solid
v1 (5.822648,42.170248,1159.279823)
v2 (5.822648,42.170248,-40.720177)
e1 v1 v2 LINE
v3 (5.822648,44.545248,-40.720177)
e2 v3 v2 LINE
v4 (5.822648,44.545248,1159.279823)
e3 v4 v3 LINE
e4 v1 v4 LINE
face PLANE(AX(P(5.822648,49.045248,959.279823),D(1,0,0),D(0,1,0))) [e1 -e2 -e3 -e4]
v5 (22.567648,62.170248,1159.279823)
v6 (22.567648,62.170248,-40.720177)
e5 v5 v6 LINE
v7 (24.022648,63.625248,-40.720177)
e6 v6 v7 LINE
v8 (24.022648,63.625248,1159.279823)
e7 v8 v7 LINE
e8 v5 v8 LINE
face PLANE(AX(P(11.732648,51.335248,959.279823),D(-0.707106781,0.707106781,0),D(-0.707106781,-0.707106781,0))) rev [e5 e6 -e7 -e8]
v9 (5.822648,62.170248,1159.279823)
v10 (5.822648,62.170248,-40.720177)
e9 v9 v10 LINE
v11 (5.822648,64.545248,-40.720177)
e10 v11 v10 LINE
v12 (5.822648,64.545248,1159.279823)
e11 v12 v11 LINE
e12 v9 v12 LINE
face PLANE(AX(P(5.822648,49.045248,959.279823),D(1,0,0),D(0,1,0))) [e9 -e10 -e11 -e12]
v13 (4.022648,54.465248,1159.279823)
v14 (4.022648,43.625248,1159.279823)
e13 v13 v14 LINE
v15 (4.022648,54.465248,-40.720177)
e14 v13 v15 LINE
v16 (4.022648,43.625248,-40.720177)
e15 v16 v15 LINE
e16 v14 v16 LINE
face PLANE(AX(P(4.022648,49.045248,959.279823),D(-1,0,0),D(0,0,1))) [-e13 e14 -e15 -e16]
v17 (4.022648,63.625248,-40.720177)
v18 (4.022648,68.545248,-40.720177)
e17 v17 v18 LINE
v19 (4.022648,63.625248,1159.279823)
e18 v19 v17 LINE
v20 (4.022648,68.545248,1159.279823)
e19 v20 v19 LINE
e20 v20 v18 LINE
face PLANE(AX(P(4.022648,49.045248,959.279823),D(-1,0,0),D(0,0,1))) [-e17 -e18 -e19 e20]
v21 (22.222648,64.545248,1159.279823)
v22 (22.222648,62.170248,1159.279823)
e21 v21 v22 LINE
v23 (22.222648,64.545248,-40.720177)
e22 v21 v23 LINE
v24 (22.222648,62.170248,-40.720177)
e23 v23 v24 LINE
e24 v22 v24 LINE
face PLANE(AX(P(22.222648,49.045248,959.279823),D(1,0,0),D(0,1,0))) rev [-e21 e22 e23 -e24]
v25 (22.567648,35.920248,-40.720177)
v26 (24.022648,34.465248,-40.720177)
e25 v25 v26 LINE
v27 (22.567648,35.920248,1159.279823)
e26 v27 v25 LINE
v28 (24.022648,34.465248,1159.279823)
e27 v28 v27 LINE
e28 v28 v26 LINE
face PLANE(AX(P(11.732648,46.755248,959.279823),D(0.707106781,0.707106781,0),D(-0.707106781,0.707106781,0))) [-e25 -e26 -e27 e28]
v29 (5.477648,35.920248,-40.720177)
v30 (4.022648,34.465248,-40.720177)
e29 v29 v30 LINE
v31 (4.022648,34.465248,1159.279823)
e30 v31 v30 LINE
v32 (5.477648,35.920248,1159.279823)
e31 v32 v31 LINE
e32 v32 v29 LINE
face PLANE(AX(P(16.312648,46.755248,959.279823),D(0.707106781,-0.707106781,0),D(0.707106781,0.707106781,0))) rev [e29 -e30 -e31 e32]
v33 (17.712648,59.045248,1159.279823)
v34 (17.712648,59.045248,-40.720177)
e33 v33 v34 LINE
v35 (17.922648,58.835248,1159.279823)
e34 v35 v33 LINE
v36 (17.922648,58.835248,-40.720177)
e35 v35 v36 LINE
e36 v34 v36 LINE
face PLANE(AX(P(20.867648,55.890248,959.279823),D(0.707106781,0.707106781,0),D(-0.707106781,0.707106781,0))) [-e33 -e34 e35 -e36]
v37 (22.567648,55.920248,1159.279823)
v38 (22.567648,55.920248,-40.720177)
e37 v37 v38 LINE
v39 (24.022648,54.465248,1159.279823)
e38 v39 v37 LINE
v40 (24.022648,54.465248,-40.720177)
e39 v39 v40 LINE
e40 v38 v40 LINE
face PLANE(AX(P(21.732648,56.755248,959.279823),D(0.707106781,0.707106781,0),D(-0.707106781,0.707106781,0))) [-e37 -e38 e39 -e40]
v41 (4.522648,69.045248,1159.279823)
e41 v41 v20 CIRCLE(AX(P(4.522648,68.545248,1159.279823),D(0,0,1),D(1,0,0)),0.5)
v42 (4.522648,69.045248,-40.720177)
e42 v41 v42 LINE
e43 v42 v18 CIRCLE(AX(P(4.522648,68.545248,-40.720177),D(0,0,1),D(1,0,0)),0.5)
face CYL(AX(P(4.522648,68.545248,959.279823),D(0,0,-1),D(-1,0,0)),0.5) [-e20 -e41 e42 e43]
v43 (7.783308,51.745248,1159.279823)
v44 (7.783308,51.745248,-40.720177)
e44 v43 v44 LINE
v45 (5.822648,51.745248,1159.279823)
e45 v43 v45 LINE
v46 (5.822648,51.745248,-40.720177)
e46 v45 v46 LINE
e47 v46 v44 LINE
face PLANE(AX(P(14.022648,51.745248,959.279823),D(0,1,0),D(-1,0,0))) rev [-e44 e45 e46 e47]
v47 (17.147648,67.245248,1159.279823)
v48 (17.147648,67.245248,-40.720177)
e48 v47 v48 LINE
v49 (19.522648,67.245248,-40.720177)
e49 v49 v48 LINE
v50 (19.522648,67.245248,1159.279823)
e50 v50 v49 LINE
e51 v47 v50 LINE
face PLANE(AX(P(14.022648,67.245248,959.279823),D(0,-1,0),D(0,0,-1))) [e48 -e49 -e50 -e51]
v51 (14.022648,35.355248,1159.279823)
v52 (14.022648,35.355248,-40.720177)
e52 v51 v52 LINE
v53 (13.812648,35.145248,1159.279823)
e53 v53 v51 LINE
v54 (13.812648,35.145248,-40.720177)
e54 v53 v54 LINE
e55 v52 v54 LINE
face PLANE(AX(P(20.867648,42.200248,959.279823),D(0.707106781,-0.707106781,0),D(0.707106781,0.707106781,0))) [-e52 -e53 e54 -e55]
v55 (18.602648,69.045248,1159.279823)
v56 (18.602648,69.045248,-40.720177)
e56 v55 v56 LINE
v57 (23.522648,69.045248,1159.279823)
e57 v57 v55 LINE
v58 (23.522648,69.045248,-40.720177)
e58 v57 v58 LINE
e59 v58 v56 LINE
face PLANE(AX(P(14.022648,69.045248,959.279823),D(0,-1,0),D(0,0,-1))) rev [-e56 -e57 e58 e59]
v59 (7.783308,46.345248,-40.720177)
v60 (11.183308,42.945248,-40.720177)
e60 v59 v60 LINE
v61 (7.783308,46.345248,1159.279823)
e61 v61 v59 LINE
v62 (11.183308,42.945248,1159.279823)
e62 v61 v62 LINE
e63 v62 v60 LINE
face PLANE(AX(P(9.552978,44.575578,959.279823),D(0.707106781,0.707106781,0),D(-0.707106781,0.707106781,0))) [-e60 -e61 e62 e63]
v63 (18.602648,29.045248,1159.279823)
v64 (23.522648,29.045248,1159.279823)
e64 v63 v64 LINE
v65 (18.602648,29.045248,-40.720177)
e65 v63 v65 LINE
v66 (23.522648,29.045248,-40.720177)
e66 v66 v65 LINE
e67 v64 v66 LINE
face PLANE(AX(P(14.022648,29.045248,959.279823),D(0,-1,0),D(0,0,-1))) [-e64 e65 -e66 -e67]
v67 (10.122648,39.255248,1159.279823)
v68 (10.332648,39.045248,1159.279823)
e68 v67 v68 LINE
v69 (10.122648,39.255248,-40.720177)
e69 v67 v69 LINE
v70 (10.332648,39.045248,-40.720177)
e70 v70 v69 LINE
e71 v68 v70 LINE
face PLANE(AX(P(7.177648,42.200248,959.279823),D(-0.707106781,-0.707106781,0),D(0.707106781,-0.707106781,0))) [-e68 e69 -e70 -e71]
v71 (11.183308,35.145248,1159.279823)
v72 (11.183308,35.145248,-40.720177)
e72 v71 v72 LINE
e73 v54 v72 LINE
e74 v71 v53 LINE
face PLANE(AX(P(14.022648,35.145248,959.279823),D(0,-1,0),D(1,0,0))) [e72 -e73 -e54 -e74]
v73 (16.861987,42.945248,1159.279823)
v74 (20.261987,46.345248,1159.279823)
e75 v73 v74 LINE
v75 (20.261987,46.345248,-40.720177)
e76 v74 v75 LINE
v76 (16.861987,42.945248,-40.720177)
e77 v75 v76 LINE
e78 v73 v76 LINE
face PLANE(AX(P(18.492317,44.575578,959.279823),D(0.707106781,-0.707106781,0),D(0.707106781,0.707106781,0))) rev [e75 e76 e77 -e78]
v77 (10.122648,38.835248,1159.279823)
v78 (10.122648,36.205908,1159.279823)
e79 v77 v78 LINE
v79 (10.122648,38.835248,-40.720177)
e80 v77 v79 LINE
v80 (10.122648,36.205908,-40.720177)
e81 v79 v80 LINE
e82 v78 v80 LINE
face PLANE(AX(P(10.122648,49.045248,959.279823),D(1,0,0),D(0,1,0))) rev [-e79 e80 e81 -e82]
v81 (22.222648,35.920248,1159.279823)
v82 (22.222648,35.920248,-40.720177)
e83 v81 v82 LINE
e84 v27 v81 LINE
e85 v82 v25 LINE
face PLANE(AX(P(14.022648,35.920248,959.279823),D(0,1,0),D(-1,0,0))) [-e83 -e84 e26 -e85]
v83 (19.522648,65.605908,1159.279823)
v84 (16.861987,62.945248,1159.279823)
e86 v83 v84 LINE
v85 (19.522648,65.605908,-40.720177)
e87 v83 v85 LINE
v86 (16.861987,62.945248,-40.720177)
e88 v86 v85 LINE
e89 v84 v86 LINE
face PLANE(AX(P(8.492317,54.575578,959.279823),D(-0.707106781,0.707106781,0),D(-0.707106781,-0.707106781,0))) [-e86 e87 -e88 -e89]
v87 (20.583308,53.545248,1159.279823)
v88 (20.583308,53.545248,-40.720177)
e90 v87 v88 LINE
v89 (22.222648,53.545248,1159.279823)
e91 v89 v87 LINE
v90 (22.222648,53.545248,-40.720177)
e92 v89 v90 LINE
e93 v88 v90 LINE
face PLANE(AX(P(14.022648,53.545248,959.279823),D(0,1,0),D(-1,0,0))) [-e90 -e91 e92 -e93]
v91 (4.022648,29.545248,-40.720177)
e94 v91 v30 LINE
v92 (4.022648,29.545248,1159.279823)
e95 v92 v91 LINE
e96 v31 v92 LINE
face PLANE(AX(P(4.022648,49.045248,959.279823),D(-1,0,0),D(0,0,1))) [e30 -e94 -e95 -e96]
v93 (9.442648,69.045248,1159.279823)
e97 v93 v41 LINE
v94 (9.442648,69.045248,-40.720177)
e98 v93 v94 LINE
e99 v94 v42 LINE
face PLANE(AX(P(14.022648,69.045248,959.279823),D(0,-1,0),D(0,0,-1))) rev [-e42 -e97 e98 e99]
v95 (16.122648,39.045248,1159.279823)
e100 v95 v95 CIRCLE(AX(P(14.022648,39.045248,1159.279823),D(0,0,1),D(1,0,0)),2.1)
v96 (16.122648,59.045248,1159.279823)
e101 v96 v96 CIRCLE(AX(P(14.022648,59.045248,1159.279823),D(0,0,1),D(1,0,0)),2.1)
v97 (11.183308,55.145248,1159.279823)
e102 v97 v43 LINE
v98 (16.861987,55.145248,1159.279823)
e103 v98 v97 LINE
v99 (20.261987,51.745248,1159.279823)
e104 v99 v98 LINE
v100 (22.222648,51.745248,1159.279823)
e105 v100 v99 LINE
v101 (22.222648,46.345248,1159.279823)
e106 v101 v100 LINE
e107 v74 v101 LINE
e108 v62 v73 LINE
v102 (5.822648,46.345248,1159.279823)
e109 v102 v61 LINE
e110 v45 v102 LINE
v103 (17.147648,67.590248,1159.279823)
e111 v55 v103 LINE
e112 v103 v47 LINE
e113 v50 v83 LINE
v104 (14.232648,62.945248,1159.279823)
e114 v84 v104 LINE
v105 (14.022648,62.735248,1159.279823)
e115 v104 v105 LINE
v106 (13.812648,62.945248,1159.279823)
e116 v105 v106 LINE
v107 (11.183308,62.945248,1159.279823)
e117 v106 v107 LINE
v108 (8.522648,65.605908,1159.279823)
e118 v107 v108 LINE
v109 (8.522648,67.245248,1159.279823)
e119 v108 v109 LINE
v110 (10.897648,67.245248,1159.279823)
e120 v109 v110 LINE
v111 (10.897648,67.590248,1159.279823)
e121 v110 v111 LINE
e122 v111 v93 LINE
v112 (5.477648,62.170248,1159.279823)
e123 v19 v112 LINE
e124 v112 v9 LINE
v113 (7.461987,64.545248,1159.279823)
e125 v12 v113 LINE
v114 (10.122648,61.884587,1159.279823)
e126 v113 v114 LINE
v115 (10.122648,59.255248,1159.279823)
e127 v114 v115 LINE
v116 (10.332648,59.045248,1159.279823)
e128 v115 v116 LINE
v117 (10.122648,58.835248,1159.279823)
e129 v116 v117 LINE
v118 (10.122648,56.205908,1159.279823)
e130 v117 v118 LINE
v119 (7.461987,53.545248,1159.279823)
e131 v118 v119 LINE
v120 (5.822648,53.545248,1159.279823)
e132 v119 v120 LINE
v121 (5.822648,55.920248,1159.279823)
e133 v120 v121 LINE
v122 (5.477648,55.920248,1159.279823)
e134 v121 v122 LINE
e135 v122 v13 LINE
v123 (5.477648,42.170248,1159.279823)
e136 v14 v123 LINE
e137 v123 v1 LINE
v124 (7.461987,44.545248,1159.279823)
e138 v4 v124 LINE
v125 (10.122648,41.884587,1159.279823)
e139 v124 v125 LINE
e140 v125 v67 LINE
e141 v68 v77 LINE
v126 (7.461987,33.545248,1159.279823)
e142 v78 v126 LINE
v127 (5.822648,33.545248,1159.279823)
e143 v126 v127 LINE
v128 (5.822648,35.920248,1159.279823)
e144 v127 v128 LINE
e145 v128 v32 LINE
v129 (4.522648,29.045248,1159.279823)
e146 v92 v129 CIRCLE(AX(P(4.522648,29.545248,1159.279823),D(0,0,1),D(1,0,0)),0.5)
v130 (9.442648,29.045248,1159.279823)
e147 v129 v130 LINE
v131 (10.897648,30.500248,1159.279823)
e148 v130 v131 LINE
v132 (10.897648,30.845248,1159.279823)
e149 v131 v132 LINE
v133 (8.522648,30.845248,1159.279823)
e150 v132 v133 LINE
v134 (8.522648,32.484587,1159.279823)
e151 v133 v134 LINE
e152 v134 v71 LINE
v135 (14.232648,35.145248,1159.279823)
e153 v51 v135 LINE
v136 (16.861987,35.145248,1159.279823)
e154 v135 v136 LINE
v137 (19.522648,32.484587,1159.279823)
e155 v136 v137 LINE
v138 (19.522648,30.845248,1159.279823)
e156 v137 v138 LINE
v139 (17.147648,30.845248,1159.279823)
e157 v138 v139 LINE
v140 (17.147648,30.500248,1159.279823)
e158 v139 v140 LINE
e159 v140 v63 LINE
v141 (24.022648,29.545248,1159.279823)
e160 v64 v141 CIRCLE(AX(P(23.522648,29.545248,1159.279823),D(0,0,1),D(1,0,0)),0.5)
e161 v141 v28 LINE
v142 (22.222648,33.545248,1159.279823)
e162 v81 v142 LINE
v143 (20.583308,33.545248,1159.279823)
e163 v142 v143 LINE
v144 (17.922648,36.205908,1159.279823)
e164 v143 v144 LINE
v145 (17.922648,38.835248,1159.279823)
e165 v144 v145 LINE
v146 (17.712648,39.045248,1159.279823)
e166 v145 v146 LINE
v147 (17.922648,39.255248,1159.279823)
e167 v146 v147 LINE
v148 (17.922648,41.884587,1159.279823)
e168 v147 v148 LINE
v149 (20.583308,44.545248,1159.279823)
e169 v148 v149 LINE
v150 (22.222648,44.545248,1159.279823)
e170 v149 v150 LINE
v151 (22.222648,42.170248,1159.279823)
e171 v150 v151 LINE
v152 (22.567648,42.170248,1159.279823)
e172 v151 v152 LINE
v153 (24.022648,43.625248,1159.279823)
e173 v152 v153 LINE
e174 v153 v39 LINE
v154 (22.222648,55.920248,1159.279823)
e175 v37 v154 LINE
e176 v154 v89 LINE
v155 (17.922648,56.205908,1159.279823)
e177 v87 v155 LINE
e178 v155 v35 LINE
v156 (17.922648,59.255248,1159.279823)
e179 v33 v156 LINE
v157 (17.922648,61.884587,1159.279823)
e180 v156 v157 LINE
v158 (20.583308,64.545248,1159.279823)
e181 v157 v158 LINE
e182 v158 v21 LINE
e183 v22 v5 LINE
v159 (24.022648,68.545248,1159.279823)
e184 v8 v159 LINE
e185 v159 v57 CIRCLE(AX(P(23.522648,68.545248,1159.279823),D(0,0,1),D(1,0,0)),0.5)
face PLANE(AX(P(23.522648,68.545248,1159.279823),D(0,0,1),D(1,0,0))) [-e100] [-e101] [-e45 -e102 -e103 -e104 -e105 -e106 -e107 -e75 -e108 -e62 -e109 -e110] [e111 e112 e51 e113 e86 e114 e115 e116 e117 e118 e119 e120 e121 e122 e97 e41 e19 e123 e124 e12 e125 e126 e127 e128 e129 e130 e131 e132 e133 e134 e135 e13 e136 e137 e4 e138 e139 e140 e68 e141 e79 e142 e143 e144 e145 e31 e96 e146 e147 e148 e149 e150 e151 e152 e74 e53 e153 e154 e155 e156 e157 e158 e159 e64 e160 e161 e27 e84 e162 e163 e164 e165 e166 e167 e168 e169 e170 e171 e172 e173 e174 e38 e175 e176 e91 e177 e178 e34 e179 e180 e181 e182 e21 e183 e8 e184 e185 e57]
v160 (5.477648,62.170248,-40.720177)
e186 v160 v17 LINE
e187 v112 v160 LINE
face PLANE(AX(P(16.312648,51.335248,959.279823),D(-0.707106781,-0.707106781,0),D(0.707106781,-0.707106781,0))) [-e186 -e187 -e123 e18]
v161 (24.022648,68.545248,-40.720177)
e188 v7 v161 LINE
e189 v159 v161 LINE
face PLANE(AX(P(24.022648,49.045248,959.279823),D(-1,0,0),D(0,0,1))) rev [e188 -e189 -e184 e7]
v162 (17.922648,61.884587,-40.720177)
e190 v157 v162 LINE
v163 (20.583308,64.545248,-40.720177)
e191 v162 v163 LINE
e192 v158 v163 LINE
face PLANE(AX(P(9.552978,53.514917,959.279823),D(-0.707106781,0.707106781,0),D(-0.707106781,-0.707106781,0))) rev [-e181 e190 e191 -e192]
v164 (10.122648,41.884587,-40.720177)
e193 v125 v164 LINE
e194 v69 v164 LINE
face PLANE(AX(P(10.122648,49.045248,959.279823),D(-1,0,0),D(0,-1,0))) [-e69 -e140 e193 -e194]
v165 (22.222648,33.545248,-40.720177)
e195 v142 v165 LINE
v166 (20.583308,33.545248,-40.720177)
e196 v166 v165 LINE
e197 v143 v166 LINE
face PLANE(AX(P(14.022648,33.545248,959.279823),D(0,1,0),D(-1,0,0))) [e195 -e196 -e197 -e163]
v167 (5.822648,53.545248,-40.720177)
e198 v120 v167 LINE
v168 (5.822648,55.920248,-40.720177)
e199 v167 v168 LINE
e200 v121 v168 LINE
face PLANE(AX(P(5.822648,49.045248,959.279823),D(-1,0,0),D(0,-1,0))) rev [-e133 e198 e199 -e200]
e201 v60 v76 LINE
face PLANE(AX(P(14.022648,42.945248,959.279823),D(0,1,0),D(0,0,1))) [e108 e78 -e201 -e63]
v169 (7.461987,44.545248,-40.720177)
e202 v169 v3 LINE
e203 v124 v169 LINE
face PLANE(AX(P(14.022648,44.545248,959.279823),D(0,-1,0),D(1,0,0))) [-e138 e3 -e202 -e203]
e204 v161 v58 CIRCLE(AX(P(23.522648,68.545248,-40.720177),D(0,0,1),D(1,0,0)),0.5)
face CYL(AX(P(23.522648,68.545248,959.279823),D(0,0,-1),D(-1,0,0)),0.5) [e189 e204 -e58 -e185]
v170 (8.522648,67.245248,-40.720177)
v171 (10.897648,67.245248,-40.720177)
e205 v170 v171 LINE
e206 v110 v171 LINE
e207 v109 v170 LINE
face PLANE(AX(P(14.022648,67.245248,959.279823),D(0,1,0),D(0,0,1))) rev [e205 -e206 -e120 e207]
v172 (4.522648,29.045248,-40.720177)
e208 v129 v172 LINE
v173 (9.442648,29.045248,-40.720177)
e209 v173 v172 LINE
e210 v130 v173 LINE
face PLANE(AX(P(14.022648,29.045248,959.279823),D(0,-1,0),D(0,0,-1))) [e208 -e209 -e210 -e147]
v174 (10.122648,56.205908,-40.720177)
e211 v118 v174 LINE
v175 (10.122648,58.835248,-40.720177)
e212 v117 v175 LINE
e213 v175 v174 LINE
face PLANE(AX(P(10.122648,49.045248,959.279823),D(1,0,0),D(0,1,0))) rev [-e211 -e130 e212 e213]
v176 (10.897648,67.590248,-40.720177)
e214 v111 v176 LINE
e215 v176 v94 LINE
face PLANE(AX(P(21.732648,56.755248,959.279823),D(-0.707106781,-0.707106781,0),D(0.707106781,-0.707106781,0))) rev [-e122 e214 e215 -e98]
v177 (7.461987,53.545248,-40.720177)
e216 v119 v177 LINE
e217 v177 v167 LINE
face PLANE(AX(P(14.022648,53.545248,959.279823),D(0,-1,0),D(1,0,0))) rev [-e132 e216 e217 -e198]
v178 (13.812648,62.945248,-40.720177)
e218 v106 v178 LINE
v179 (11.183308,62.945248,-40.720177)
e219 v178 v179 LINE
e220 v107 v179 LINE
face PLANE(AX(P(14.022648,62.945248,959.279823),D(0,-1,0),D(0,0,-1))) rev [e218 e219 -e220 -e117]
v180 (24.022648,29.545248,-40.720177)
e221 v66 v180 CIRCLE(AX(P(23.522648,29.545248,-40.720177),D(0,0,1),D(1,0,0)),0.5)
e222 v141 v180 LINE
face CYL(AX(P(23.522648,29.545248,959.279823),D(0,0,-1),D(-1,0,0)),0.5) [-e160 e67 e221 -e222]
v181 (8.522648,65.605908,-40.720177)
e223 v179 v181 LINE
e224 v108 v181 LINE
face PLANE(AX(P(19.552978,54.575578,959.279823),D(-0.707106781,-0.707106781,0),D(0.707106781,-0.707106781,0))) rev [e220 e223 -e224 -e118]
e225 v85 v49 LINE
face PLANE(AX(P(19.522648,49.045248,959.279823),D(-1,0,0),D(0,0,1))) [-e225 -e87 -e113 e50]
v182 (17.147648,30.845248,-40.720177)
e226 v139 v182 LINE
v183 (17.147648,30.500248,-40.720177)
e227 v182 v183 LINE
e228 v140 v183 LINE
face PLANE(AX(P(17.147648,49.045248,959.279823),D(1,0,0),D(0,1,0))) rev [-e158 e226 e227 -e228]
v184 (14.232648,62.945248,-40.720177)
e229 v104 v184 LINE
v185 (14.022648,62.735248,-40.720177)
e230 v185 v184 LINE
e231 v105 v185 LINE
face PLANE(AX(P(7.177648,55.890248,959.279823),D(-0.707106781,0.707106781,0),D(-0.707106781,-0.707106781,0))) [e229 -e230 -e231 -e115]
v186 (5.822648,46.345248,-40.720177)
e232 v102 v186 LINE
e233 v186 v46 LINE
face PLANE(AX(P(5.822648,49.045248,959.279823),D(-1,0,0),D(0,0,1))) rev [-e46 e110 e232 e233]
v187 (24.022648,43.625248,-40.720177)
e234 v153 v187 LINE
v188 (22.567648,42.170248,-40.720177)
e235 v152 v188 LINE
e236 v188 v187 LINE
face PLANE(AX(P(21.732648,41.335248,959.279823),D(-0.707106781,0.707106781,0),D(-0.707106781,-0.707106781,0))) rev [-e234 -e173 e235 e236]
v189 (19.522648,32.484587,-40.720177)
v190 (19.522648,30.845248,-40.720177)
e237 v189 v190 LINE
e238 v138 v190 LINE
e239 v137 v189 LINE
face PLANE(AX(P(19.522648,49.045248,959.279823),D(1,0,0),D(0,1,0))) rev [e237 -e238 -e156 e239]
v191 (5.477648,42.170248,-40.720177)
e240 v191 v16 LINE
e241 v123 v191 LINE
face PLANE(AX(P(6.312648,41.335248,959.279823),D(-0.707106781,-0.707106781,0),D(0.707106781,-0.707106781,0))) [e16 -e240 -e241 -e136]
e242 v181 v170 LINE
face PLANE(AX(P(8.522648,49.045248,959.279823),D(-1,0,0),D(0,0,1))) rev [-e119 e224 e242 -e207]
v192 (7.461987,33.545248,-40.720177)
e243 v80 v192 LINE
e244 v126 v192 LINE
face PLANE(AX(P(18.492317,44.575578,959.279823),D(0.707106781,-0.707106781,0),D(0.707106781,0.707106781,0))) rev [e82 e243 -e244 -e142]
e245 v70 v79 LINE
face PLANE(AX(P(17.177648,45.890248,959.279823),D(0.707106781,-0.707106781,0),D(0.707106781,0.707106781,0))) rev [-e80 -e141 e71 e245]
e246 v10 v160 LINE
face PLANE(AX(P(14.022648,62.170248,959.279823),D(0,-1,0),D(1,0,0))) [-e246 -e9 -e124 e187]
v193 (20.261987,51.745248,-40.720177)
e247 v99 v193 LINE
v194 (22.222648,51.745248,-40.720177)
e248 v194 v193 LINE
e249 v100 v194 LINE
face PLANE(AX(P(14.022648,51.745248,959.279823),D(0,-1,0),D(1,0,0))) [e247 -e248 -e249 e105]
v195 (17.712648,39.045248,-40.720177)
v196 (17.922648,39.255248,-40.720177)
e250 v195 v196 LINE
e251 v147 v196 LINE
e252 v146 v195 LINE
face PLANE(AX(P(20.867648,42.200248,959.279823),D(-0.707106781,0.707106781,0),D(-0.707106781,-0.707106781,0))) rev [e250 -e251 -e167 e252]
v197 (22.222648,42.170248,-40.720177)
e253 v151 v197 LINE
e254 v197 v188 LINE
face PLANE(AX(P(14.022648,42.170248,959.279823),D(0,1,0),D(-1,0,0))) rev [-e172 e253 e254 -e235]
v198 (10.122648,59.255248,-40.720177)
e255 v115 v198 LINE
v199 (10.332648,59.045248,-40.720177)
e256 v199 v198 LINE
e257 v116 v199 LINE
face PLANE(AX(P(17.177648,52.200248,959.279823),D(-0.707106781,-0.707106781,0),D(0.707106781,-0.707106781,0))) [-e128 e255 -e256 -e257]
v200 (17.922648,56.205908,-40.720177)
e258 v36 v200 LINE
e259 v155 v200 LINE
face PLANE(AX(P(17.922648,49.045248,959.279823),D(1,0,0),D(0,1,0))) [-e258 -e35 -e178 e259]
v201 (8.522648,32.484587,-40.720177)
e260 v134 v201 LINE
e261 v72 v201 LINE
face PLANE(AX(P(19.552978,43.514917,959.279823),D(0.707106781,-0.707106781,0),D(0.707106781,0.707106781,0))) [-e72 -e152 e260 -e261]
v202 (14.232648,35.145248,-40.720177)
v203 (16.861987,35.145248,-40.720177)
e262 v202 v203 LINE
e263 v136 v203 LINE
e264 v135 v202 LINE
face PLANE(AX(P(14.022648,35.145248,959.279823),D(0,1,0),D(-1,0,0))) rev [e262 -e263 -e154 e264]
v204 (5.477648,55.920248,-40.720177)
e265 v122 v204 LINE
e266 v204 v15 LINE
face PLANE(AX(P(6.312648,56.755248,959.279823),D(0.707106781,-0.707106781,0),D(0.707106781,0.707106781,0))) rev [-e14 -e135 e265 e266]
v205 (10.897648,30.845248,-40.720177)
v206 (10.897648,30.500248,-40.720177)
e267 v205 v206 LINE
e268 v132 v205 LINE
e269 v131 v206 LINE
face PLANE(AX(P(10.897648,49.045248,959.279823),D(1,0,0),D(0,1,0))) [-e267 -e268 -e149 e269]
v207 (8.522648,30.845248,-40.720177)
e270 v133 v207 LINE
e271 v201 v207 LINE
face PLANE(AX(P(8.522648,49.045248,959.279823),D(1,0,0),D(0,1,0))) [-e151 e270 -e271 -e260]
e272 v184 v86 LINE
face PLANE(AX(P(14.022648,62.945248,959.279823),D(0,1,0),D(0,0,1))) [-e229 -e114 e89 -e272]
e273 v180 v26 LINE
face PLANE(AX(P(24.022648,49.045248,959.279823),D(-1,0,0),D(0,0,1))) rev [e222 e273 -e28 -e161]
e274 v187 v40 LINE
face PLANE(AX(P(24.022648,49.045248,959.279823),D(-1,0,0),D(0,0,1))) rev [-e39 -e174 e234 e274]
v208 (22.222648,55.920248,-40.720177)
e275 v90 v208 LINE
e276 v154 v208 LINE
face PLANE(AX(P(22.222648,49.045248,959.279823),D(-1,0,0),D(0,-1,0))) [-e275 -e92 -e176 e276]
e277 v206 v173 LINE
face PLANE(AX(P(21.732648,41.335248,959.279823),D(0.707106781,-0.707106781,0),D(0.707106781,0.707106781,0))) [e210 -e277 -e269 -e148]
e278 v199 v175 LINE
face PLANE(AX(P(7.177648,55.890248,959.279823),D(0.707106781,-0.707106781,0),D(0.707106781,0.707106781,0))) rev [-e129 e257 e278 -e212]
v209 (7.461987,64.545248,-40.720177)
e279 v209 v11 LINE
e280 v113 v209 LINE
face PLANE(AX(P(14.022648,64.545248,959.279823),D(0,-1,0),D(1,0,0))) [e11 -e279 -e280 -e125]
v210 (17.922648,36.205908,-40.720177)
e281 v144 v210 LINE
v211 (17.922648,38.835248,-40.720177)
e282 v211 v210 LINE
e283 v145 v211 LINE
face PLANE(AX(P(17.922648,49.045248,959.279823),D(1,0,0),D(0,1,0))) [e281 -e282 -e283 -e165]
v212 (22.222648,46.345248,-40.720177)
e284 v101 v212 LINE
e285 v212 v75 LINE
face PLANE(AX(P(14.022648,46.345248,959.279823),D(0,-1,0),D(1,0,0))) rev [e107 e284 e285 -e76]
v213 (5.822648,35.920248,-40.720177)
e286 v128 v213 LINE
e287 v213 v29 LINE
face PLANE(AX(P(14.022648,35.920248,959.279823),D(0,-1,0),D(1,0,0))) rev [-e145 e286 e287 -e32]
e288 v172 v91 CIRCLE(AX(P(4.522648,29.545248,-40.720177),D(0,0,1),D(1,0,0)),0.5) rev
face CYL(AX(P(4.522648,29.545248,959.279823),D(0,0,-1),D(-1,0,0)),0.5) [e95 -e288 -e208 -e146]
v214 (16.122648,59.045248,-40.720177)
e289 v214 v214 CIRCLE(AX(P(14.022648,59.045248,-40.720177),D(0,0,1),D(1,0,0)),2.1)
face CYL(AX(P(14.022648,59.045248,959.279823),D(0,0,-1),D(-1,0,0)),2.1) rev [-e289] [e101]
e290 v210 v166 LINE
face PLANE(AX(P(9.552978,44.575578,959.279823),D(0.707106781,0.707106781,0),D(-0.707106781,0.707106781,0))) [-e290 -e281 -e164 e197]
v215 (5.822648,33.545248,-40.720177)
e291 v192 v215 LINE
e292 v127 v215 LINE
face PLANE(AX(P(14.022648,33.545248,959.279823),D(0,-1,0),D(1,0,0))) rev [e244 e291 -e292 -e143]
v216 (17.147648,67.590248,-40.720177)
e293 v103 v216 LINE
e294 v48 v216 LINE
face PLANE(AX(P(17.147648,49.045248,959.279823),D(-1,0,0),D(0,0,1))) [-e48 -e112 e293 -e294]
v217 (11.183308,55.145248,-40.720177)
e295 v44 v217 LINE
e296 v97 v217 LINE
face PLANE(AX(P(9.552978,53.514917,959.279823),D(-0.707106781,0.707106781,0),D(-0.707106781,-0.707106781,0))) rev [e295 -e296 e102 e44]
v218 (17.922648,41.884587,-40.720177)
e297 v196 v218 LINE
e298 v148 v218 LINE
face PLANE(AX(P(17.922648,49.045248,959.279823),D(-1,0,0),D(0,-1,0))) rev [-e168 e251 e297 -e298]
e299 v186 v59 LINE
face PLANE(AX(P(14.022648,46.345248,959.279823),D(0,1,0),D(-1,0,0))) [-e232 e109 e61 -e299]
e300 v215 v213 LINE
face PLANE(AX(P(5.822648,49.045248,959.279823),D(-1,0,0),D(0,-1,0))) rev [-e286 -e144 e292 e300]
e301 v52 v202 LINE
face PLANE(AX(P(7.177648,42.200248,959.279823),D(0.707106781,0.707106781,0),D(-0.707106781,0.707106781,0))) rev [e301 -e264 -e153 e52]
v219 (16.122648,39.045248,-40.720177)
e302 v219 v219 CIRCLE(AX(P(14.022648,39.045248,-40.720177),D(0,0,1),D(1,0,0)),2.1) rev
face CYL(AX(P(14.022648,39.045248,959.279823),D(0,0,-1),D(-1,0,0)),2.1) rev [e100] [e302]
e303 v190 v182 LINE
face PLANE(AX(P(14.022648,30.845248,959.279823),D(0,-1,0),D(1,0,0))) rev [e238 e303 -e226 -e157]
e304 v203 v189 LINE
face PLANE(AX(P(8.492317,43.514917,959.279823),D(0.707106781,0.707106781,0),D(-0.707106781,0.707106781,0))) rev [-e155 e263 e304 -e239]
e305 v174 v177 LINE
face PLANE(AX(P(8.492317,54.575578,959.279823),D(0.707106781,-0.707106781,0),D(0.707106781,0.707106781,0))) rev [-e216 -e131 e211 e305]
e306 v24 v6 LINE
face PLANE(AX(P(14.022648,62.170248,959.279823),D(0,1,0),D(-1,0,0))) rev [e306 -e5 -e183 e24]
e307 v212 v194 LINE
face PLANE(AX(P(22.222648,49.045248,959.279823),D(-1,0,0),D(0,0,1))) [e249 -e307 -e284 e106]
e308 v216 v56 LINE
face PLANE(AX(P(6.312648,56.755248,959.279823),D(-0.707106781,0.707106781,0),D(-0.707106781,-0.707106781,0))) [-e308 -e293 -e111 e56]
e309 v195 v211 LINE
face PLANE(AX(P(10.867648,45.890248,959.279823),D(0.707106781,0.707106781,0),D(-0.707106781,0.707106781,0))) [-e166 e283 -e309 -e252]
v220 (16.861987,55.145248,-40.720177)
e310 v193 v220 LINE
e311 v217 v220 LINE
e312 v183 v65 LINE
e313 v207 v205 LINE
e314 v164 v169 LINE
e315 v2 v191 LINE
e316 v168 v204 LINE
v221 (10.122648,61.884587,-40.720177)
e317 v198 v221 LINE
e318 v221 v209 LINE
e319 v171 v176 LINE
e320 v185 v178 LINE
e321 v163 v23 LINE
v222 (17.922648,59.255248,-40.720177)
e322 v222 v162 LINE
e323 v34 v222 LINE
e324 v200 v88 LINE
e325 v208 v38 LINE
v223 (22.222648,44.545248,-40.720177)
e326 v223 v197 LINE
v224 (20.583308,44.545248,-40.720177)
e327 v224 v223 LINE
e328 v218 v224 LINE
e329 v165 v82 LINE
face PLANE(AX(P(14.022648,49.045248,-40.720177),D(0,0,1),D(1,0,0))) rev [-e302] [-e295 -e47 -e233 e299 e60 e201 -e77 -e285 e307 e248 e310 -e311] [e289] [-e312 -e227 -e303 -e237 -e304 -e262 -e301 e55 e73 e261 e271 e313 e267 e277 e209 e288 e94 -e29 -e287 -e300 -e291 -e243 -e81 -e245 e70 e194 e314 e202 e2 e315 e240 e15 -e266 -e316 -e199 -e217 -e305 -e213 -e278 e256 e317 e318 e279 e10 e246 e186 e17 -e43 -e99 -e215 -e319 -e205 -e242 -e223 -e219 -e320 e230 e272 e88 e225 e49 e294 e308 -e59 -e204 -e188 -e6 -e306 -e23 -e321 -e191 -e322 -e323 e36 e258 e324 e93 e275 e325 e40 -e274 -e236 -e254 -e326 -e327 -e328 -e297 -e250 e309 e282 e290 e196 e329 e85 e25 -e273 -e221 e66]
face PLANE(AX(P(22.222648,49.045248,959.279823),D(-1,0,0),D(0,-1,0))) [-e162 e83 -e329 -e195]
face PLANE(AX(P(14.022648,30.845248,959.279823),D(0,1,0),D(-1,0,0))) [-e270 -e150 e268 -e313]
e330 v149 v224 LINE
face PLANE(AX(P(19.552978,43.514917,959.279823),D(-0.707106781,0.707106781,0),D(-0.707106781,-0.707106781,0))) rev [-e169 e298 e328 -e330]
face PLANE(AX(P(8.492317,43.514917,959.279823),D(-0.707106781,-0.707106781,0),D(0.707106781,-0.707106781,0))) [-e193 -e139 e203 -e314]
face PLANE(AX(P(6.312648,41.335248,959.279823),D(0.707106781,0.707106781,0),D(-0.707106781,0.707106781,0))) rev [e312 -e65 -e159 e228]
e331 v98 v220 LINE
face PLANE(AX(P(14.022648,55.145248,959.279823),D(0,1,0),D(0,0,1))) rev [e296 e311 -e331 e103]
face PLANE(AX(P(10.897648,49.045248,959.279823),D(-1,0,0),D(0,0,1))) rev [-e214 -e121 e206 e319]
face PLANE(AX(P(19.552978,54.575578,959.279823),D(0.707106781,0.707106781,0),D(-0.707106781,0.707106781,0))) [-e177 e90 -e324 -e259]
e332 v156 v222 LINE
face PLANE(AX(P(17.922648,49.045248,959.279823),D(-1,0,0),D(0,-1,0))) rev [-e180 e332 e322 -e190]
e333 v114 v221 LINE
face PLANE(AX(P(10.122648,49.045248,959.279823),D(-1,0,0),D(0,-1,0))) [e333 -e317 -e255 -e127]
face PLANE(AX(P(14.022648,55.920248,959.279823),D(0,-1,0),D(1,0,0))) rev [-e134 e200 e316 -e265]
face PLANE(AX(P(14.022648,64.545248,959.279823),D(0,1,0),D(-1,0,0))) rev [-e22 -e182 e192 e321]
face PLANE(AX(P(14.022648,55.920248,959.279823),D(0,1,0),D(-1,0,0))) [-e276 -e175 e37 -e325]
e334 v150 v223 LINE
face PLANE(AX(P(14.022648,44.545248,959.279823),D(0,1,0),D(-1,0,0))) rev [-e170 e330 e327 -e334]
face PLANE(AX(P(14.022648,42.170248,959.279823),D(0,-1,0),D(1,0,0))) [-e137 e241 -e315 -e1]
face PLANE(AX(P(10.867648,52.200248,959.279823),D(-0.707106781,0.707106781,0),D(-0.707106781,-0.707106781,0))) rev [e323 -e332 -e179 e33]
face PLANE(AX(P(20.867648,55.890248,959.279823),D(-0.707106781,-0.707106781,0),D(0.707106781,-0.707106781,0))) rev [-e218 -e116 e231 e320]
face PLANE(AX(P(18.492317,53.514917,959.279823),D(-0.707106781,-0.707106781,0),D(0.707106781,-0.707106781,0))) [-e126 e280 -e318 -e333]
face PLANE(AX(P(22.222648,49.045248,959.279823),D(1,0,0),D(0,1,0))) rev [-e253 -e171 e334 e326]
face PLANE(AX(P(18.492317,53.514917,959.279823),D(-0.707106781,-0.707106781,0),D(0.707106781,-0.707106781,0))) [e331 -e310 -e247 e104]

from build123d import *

# Parameters (mm, degrees)
V_SLOT_START                            = -40.720177315
V_SLOT_20X40X1000_LINEAR_RAIL_OUTLINE_R = 2.1
V_SLOT_20X40X1000_LINEAR_RAIL_DEPTH     = 1000
SKETCH1_R                               = 2.1
BOSS_EXTRUDE1_DEPTH                     = 200


# Read off the part's stored shape, not the designer's step: V-Slot 20x40x1000 Linear Rail
with BuildPart() as part:
    # V-Slot 20x40x1000 Linear Rail outline → V-Slot 20x40x1000 Linear Rail (new body)
    with BuildSketch(Plane.XY.offset(V_SLOT_START)):
        with BuildLine():
            Line((17.922647509, 56.20590772), (17.922647509, 58.835247549))
            Line((17.922647509, 58.835247549), (17.712647509, 59.045247549))
            Line((17.712647509, 59.045247549), (17.922647509, 59.255247549))
            Line((17.922647509, 59.255247549), (17.922647509, 61.884587377))
            Line((17.922647509, 61.884587377), (20.583307681, 64.545247549))
            Line((20.583307681, 64.545247549), (22.222647509, 64.545247549))
            Line((22.222647509, 64.545247549), (22.222647509, 62.170247549))
            Line((22.222647509, 62.170247549), (22.567647509, 62.170247549))
            Line((22.567647509, 62.170247549), (24.022647509, 63.625247549))
            Line((24.022647509, 63.625247549), (24.022647509, 68.545247549))
            ThreePointArc((24.022647509, 68.545247549), (23.876200899, 68.898800939), (23.522647509, 69.045247549))
            Line((23.522647509, 69.045247549), (18.602647509, 69.045247549))
            Line((18.602647509, 69.045247549), (17.147647509, 67.590247549))
            Line((17.147647509, 67.590247549), (17.147647509, 67.245247549))
            Line((17.147647509, 67.245247549), (19.522647509, 67.245247549))
            Line((19.522647509, 67.245247549), (19.522647509, 65.60590772))
            Line((19.522647509, 65.60590772), (16.861987337, 62.945247549))
            Line((16.861987337, 62.945247549), (14.232647509, 62.945247549))
            Line((14.232647509, 62.945247549), (14.022647509, 62.735247549))
            Line((14.022647509, 62.735247549), (13.812647509, 62.945247549))
            Line((13.812647509, 62.945247549), (11.183307681, 62.945247549))
            Line((11.183307681, 62.945247549), (8.522647509, 65.60590772))
            Line((8.522647509, 65.60590772), (8.522647509, 67.245247549))
            Line((8.522647509, 67.245247549), (10.897647509, 67.245247549))
            Line((10.897647509, 67.245247549), (10.897647509, 67.590247549))
            Line((10.897647509, 67.590247549), (9.442647509, 69.045247549))
            Line((9.442647509, 69.045247549), (4.522647509, 69.045247549))
            ThreePointArc((4.522647509, 69.045247549), (4.169094118, 68.898800939), (4.022647509, 68.545247549))
            Line((4.022647509, 68.545247549), (4.022647509, 63.625247549))
            Line((4.022647509, 63.625247549), (5.477647509, 62.170247549))
            Line((5.477647509, 62.170247549), (5.822647509, 62.170247549))
            Line((5.822647509, 62.170247549), (5.822647509, 64.545247549))
            Line((5.822647509, 64.545247549), (7.461987337, 64.545247549))
            Line((7.461987337, 64.545247549), (10.122647509, 61.884587377))
            Line((10.122647509, 61.884587377), (10.122647509, 59.255247549))
            Line((10.122647509, 59.255247549), (10.332647509, 59.045247549))
            Line((10.332647509, 59.045247549), (10.122647509, 58.835247549))
            Line((10.122647509, 58.835247549), (10.122647509, 56.20590772))
            Line((10.122647509, 56.20590772), (7.461987337, 53.545247549))
            Line((7.461987337, 53.545247549), (5.822647509, 53.545247549))
            Line((5.822647509, 53.545247549), (5.822647509, 55.920247549))
            Line((5.822647509, 55.920247549), (5.477647509, 55.920247549))
            Line((5.477647509, 55.920247549), (4.022647509, 54.465247549))
            Line((4.022647509, 54.465247549), (4.022647509, 43.625247549))
            Line((4.022647509, 43.625247549), (5.477647509, 42.170247549))
            Line((5.477647509, 42.170247549), (5.822647509, 42.170247549))
            Line((5.822647509, 42.170247549), (5.822647509, 44.545247549))
            Line((5.822647509, 44.545247549), (7.461987337, 44.545247549))
            Line((7.461987337, 44.545247549), (10.122647509, 41.884587377))
            Line((10.122647509, 41.884587377), (10.122647509, 39.255247549))
            Line((10.122647509, 39.255247549), (10.332647509, 39.045247549))
            Line((10.332647509, 39.045247549), (10.122647509, 38.835247549))
            Line((10.122647509, 38.835247549), (10.122647509, 36.20590772))
            Line((10.122647509, 36.20590772), (7.461987337, 33.545247549))
            Line((7.461987337, 33.545247549), (5.822647509, 33.545247549))
            Line((5.822647509, 33.545247549), (5.822647509, 35.920247549))
            Line((5.822647509, 35.920247549), (5.477647509, 35.920247549))
            Line((5.477647509, 35.920247549), (4.022647509, 34.465247549))
            Line((4.022647509, 34.465247549), (4.022647509, 29.545247549))
            ThreePointArc((4.022647509, 29.545247549), (4.169094118, 29.191694158), (4.522647509, 29.045247549))
            Line((4.522647509, 29.045247549), (9.442647509, 29.045247549))
            Line((9.442647509, 29.045247549), (10.897647509, 30.500247549))
            Line((10.897647509, 30.500247549), (10.897647509, 30.845247549))
            Line((10.897647509, 30.845247549), (8.522647509, 30.845247549))
            Line((8.522647509, 30.845247549), (8.522647509, 32.484587377))
            Line((8.522647509, 32.484587377), (11.183307681, 35.145247549))
            Line((11.183307681, 35.145247549), (13.812647509, 35.145247549))
            Line((13.812647509, 35.145247549), (14.022647509, 35.355247549))
            Line((14.022647509, 35.355247549), (14.232647509, 35.145247549))
            Line((14.232647509, 35.145247549), (16.861987337, 35.145247549))
            Line((16.861987337, 35.145247549), (19.522647509, 32.484587377))
            Line((19.522647509, 32.484587377), (19.522647509, 30.845247549))
            Line((19.522647509, 30.845247549), (17.147647509, 30.845247549))
            Line((17.147647509, 30.845247549), (17.147647509, 30.500247549))
            Line((17.147647509, 30.500247549), (18.602647509, 29.045247549))
            Line((18.602647509, 29.045247549), (23.522647509, 29.045247549))
            ThreePointArc((23.522647509, 29.045247549), (23.876200899, 29.191694158), (24.022647509, 29.545247549))
            Line((24.022647509, 29.545247549), (24.022647509, 34.465247549))
            Line((24.022647509, 34.465247549), (22.567647509, 35.920247549))
            Line((22.567647509, 35.920247549), (22.222647509, 35.920247549))
            Line((22.222647509, 35.920247549), (22.222647509, 33.545247549))
            Line((22.222647509, 33.545247549), (20.583307681, 33.545247549))
            Line((20.583307681, 33.545247549), (17.922647509, 36.20590772))
            Line((17.922647509, 36.20590772), (17.922647509, 38.835247549))
            Line((17.922647509, 38.835247549), (17.712647509, 39.045247549))
            Line((17.712647509, 39.045247549), (17.922647509, 39.255247549))
            Line((17.922647509, 39.255247549), (17.922647509, 41.884587377))
            Line((17.922647509, 41.884587377), (20.583307681, 44.545247549))
            Line((20.583307681, 44.545247549), (22.222647509, 44.545247549))
            Line((22.222647509, 44.545247549), (22.222647509, 42.170247549))
            Line((22.222647509, 42.170247549), (22.567647509, 42.170247549))
            Line((22.567647509, 42.170247549), (24.022647509, 43.625247549))
            Line((24.022647509, 43.625247549), (24.022647509, 54.465247549))
            Line((24.022647509, 54.465247549), (22.567647509, 55.920247549))
            Line((22.567647509, 55.920247549), (22.222647509, 55.920247549))
            Line((22.222647509, 55.920247549), (22.222647509, 53.545247549))
            Line((22.222647509, 53.545247549), (20.583307681, 53.545247549))
            Line((20.583307681, 53.545247549), (17.922647509, 56.20590772))
        make_face()
        with Locations((14.022647509, 39.045247549)):
            Circle(V_SLOT_20X40X1000_LINEAR_RAIL_OUTLINE_R, mode=Mode.SUBTRACT)
        Polygon((11.183307681, 42.945247549), (7.783307681, 46.345247549), (5.822647509, 46.345247549), (5.822647509, 51.745247549), (7.783307681, 51.745247549), (11.183307681, 55.145247549), (16.861987337, 55.145247549), (20.261987337, 51.745247549), (22.222647509, 51.745247549), (22.222647509, 46.345247549), (20.261987337, 46.345247549), (16.861987337, 42.945247549), align=None, mode=Mode.SUBTRACT)
        with Locations((14.022647509, 59.045247549)):
            Circle(V_SLOT_20X40X1000_LINEAR_RAIL_OUTLINE_R, mode=Mode.SUBTRACT)
    extrude(amount=V_SLOT_20X40X1000_LINEAR_RAIL_DEPTH)

    # Sketch1 → Boss-Extrude1 (add)
    with BuildSketch(Plane.XY.offset(959.279822685)):
        with BuildLine():
            Line((17.922647509, 58.835247549), (17.712647509, 59.045247549))
            Line((17.712647509, 59.045247549), (17.922647509, 59.255247549))
            Line((17.922647509, 59.255247549), (17.922647509, 61.884587377))
            Line((17.922647509, 61.884587377), (20.583307681, 64.545247549))
            Line((20.583307681, 64.545247549), (22.222647509, 64.545247549))
            Line((22.222647509, 64.545247549), (22.222647509, 62.170247549))
            Line((22.222647509, 62.170247549), (22.567647509, 62.170247549))
            Line((22.567647509, 62.170247549), (24.022647509, 63.625247549))
            Line((24.022647509, 63.625247549), (24.022647509, 68.545247549))
            ThreePointArc((24.022647509, 68.545247549), (23.876200899, 68.898800939), (23.522647509, 69.045247549))
            Line((23.522647509, 69.045247549), (18.602647509, 69.045247549))
            Line((18.602647509, 69.045247549), (17.147647509, 67.590247549))
            Line((17.147647509, 67.590247549), (17.147647509, 67.245247549))
            Line((17.147647509, 67.245247549), (19.522647509, 67.245247549))
            Line((19.522647509, 67.245247549), (19.522647509, 65.60590772))
            Line((19.522647509, 65.60590772), (16.861987337, 62.945247549))
            Line((16.861987337, 62.945247549), (14.232647509, 62.945247549))
            Line((14.232647509, 62.945247549), (14.022647509, 62.735247549))
            Line((14.022647509, 62.735247549), (13.812647509, 62.945247549))
            Line((13.812647509, 62.945247549), (11.183307681, 62.945247549))
            Line((11.183307681, 62.945247549), (8.522647509, 65.60590772))
            Line((8.522647509, 65.60590772), (8.522647509, 67.245247549))
            Line((8.522647509, 67.245247549), (10.897647509, 67.245247549))
            Line((10.897647509, 67.245247549), (10.897647509, 67.590247549))
            Line((10.897647509, 67.590247549), (9.442647509, 69.045247549))
            Line((9.442647509, 69.045247549), (4.522647509, 69.045247549))
            ThreePointArc((4.522647509, 69.045247549), (4.169094118, 68.898800939), (4.022647509, 68.545247549))
            Line((4.022647509, 68.545247549), (4.022647509, 63.625247549))
            Line((4.022647509, 63.625247549), (5.477647509, 62.170247549))
            Line((5.477647509, 62.170247549), (5.822647509, 62.170247549))
            Line((5.822647509, 62.170247549), (5.822647509, 64.545247549))
            Line((5.822647509, 64.545247549), (7.461987337, 64.545247549))
            Line((7.461987337, 64.545247549), (10.122647509, 61.884587377))
            Line((10.122647509, 61.884587377), (10.122647509, 59.255247549))
            Line((10.122647509, 59.255247549), (10.332647509, 59.045247549))
            Line((10.332647509, 59.045247549), (10.122647509, 58.835247549))
            Line((10.122647509, 58.835247549), (10.122647509, 56.20590772))
            Line((10.122647509, 56.20590772), (7.461987337, 53.545247549))
            Line((7.461987337, 53.545247549), (5.822647509, 53.545247549))
            Line((5.822647509, 53.545247549), (5.822647509, 55.920247549))
            Line((5.822647509, 55.920247549), (5.477647509, 55.920247549))
            Line((5.477647509, 55.920247549), (4.022647509, 54.465247549))
            Line((4.022647509, 54.465247549), (4.022647509, 43.625247549))
            Line((4.022647509, 43.625247549), (5.477647509, 42.170247549))
            Line((5.477647509, 42.170247549), (5.822647509, 42.170247549))
            Line((5.822647509, 42.170247549), (5.822647509, 44.545247549))
            Line((5.822647509, 44.545247549), (7.461987337, 44.545247549))
            Line((7.461987337, 44.545247549), (10.122647509, 41.884587377))
            Line((10.122647509, 41.884587377), (10.122647509, 39.255247549))
            Line((10.122647509, 39.255247549), (10.332647509, 39.045247549))
            Line((10.332647509, 39.045247549), (10.122647509, 38.835247549))
            Line((10.122647509, 38.835247549), (10.122647509, 36.20590772))
            Line((10.122647509, 36.20590772), (7.461987337, 33.545247549))
            Line((7.461987337, 33.545247549), (5.822647509, 33.545247549))
            Line((5.822647509, 33.545247549), (5.822647509, 35.920247549))
            Line((5.822647509, 35.920247549), (5.477647509, 35.920247549))
            Line((5.477647509, 35.920247549), (4.022647509, 34.465247549))
            Line((4.022647509, 34.465247549), (4.022647509, 29.545247549))
            ThreePointArc((4.022647509, 29.545247549), (4.169094118, 29.191694158), (4.522647509, 29.045247549))
            Line((4.522647509, 29.045247549), (9.442647509, 29.045247549))
            Line((9.442647509, 29.045247549), (10.897647509, 30.500247549))
            Line((10.897647509, 30.500247549), (10.897647509, 30.845247549))
            Line((10.897647509, 30.845247549), (8.522647509, 30.845247549))
            Line((8.522647509, 30.845247549), (8.522647509, 32.484587377))
            Line((8.522647509, 32.484587377), (11.183307681, 35.145247549))
            Line((11.183307681, 35.145247549), (13.812647509, 35.145247549))
            Line((13.812647509, 35.145247549), (14.022647509, 35.355247549))
            Line((14.022647509, 35.355247549), (14.232647509, 35.145247549))
            Line((14.232647509, 35.145247549), (16.861987337, 35.145247549))
            Line((16.861987337, 35.145247549), (19.522647509, 32.484587377))
            Line((19.522647509, 32.484587377), (19.522647509, 30.845247549))
            Line((19.522647509, 30.845247549), (17.147647509, 30.845247549))
            Line((17.147647509, 30.845247549), (17.147647509, 30.500247549))
            Line((17.147647509, 30.500247549), (18.602647509, 29.045247549))
            Line((18.602647509, 29.045247549), (23.522647509, 29.045247549))
            ThreePointArc((23.522647509, 29.045247549), (23.876200899, 29.191694158), (24.022647509, 29.545247549))
            Line((24.022647509, 29.545247549), (24.022647509, 34.465247549))
            Line((24.022647509, 34.465247549), (22.567647509, 35.920247549))
            Line((22.567647509, 35.920247549), (22.222647509, 35.920247549))
            Line((22.222647509, 35.920247549), (22.222647509, 33.545247549))
            Line((22.222647509, 33.545247549), (20.583307681, 33.545247549))
            Line((20.583307681, 33.545247549), (17.922647509, 36.20590772))
            Line((17.922647509, 36.20590772), (17.922647509, 38.835247549))
            Line((17.922647509, 38.835247549), (17.712647509, 39.045247549))
            Line((17.712647509, 39.045247549), (17.922647509, 39.255247549))
            Line((17.922647509, 39.255247549), (17.922647509, 41.884587377))
            Line((17.922647509, 41.884587377), (20.583307681, 44.545247549))
            Line((20.583307681, 44.545247549), (22.222647509, 44.545247549))
            Line((22.222647509, 44.545247549), (22.222647509, 42.170247549))
            Line((22.222647509, 42.170247549), (22.567647509, 42.170247549))
            Line((22.567647509, 42.170247549), (24.022647509, 43.625247549))
            Line((24.022647509, 43.625247549), (24.022647509, 54.465247549))
            Line((24.022647509, 54.465247549), (22.567647509, 55.920247549))
            Line((22.567647509, 55.920247549), (22.222647509, 55.920247549))
            Line((22.222647509, 55.920247549), (22.222647509, 53.545247549))
            Line((22.222647509, 53.545247549), (20.583307681, 53.545247549))
            Line((20.583307681, 53.545247549), (17.922647509, 56.20590772))
            Line((17.922647509, 56.20590772), (17.922647509, 58.835247549))
        make_face()
        with Locations((14.022647509, 39.045247549)):
            Circle(SKETCH1_R, mode=Mode.SUBTRACT)
        with Locations((14.022647509, 59.045247549)):
            Circle(SKETCH1_R, mode=Mode.SUBTRACT)
        Polygon((7.783307681, 51.745247549), (11.183307681, 55.145247549), (16.861987337, 55.145247549), (20.261987337, 51.745247549), (22.222647509, 51.745247549), (22.222647509, 46.345247549), (20.261987337, 46.345247549), (16.861987337, 42.945247549), (11.183307681, 42.945247549), (7.783307681, 46.345247549), (5.822647509, 46.345247549), (5.822647509, 51.745247549), align=None, mode=Mode.SUBTRACT)
    extrude(amount=BOSS_EXTRUDE1_DEPTH)


solid = part.part
